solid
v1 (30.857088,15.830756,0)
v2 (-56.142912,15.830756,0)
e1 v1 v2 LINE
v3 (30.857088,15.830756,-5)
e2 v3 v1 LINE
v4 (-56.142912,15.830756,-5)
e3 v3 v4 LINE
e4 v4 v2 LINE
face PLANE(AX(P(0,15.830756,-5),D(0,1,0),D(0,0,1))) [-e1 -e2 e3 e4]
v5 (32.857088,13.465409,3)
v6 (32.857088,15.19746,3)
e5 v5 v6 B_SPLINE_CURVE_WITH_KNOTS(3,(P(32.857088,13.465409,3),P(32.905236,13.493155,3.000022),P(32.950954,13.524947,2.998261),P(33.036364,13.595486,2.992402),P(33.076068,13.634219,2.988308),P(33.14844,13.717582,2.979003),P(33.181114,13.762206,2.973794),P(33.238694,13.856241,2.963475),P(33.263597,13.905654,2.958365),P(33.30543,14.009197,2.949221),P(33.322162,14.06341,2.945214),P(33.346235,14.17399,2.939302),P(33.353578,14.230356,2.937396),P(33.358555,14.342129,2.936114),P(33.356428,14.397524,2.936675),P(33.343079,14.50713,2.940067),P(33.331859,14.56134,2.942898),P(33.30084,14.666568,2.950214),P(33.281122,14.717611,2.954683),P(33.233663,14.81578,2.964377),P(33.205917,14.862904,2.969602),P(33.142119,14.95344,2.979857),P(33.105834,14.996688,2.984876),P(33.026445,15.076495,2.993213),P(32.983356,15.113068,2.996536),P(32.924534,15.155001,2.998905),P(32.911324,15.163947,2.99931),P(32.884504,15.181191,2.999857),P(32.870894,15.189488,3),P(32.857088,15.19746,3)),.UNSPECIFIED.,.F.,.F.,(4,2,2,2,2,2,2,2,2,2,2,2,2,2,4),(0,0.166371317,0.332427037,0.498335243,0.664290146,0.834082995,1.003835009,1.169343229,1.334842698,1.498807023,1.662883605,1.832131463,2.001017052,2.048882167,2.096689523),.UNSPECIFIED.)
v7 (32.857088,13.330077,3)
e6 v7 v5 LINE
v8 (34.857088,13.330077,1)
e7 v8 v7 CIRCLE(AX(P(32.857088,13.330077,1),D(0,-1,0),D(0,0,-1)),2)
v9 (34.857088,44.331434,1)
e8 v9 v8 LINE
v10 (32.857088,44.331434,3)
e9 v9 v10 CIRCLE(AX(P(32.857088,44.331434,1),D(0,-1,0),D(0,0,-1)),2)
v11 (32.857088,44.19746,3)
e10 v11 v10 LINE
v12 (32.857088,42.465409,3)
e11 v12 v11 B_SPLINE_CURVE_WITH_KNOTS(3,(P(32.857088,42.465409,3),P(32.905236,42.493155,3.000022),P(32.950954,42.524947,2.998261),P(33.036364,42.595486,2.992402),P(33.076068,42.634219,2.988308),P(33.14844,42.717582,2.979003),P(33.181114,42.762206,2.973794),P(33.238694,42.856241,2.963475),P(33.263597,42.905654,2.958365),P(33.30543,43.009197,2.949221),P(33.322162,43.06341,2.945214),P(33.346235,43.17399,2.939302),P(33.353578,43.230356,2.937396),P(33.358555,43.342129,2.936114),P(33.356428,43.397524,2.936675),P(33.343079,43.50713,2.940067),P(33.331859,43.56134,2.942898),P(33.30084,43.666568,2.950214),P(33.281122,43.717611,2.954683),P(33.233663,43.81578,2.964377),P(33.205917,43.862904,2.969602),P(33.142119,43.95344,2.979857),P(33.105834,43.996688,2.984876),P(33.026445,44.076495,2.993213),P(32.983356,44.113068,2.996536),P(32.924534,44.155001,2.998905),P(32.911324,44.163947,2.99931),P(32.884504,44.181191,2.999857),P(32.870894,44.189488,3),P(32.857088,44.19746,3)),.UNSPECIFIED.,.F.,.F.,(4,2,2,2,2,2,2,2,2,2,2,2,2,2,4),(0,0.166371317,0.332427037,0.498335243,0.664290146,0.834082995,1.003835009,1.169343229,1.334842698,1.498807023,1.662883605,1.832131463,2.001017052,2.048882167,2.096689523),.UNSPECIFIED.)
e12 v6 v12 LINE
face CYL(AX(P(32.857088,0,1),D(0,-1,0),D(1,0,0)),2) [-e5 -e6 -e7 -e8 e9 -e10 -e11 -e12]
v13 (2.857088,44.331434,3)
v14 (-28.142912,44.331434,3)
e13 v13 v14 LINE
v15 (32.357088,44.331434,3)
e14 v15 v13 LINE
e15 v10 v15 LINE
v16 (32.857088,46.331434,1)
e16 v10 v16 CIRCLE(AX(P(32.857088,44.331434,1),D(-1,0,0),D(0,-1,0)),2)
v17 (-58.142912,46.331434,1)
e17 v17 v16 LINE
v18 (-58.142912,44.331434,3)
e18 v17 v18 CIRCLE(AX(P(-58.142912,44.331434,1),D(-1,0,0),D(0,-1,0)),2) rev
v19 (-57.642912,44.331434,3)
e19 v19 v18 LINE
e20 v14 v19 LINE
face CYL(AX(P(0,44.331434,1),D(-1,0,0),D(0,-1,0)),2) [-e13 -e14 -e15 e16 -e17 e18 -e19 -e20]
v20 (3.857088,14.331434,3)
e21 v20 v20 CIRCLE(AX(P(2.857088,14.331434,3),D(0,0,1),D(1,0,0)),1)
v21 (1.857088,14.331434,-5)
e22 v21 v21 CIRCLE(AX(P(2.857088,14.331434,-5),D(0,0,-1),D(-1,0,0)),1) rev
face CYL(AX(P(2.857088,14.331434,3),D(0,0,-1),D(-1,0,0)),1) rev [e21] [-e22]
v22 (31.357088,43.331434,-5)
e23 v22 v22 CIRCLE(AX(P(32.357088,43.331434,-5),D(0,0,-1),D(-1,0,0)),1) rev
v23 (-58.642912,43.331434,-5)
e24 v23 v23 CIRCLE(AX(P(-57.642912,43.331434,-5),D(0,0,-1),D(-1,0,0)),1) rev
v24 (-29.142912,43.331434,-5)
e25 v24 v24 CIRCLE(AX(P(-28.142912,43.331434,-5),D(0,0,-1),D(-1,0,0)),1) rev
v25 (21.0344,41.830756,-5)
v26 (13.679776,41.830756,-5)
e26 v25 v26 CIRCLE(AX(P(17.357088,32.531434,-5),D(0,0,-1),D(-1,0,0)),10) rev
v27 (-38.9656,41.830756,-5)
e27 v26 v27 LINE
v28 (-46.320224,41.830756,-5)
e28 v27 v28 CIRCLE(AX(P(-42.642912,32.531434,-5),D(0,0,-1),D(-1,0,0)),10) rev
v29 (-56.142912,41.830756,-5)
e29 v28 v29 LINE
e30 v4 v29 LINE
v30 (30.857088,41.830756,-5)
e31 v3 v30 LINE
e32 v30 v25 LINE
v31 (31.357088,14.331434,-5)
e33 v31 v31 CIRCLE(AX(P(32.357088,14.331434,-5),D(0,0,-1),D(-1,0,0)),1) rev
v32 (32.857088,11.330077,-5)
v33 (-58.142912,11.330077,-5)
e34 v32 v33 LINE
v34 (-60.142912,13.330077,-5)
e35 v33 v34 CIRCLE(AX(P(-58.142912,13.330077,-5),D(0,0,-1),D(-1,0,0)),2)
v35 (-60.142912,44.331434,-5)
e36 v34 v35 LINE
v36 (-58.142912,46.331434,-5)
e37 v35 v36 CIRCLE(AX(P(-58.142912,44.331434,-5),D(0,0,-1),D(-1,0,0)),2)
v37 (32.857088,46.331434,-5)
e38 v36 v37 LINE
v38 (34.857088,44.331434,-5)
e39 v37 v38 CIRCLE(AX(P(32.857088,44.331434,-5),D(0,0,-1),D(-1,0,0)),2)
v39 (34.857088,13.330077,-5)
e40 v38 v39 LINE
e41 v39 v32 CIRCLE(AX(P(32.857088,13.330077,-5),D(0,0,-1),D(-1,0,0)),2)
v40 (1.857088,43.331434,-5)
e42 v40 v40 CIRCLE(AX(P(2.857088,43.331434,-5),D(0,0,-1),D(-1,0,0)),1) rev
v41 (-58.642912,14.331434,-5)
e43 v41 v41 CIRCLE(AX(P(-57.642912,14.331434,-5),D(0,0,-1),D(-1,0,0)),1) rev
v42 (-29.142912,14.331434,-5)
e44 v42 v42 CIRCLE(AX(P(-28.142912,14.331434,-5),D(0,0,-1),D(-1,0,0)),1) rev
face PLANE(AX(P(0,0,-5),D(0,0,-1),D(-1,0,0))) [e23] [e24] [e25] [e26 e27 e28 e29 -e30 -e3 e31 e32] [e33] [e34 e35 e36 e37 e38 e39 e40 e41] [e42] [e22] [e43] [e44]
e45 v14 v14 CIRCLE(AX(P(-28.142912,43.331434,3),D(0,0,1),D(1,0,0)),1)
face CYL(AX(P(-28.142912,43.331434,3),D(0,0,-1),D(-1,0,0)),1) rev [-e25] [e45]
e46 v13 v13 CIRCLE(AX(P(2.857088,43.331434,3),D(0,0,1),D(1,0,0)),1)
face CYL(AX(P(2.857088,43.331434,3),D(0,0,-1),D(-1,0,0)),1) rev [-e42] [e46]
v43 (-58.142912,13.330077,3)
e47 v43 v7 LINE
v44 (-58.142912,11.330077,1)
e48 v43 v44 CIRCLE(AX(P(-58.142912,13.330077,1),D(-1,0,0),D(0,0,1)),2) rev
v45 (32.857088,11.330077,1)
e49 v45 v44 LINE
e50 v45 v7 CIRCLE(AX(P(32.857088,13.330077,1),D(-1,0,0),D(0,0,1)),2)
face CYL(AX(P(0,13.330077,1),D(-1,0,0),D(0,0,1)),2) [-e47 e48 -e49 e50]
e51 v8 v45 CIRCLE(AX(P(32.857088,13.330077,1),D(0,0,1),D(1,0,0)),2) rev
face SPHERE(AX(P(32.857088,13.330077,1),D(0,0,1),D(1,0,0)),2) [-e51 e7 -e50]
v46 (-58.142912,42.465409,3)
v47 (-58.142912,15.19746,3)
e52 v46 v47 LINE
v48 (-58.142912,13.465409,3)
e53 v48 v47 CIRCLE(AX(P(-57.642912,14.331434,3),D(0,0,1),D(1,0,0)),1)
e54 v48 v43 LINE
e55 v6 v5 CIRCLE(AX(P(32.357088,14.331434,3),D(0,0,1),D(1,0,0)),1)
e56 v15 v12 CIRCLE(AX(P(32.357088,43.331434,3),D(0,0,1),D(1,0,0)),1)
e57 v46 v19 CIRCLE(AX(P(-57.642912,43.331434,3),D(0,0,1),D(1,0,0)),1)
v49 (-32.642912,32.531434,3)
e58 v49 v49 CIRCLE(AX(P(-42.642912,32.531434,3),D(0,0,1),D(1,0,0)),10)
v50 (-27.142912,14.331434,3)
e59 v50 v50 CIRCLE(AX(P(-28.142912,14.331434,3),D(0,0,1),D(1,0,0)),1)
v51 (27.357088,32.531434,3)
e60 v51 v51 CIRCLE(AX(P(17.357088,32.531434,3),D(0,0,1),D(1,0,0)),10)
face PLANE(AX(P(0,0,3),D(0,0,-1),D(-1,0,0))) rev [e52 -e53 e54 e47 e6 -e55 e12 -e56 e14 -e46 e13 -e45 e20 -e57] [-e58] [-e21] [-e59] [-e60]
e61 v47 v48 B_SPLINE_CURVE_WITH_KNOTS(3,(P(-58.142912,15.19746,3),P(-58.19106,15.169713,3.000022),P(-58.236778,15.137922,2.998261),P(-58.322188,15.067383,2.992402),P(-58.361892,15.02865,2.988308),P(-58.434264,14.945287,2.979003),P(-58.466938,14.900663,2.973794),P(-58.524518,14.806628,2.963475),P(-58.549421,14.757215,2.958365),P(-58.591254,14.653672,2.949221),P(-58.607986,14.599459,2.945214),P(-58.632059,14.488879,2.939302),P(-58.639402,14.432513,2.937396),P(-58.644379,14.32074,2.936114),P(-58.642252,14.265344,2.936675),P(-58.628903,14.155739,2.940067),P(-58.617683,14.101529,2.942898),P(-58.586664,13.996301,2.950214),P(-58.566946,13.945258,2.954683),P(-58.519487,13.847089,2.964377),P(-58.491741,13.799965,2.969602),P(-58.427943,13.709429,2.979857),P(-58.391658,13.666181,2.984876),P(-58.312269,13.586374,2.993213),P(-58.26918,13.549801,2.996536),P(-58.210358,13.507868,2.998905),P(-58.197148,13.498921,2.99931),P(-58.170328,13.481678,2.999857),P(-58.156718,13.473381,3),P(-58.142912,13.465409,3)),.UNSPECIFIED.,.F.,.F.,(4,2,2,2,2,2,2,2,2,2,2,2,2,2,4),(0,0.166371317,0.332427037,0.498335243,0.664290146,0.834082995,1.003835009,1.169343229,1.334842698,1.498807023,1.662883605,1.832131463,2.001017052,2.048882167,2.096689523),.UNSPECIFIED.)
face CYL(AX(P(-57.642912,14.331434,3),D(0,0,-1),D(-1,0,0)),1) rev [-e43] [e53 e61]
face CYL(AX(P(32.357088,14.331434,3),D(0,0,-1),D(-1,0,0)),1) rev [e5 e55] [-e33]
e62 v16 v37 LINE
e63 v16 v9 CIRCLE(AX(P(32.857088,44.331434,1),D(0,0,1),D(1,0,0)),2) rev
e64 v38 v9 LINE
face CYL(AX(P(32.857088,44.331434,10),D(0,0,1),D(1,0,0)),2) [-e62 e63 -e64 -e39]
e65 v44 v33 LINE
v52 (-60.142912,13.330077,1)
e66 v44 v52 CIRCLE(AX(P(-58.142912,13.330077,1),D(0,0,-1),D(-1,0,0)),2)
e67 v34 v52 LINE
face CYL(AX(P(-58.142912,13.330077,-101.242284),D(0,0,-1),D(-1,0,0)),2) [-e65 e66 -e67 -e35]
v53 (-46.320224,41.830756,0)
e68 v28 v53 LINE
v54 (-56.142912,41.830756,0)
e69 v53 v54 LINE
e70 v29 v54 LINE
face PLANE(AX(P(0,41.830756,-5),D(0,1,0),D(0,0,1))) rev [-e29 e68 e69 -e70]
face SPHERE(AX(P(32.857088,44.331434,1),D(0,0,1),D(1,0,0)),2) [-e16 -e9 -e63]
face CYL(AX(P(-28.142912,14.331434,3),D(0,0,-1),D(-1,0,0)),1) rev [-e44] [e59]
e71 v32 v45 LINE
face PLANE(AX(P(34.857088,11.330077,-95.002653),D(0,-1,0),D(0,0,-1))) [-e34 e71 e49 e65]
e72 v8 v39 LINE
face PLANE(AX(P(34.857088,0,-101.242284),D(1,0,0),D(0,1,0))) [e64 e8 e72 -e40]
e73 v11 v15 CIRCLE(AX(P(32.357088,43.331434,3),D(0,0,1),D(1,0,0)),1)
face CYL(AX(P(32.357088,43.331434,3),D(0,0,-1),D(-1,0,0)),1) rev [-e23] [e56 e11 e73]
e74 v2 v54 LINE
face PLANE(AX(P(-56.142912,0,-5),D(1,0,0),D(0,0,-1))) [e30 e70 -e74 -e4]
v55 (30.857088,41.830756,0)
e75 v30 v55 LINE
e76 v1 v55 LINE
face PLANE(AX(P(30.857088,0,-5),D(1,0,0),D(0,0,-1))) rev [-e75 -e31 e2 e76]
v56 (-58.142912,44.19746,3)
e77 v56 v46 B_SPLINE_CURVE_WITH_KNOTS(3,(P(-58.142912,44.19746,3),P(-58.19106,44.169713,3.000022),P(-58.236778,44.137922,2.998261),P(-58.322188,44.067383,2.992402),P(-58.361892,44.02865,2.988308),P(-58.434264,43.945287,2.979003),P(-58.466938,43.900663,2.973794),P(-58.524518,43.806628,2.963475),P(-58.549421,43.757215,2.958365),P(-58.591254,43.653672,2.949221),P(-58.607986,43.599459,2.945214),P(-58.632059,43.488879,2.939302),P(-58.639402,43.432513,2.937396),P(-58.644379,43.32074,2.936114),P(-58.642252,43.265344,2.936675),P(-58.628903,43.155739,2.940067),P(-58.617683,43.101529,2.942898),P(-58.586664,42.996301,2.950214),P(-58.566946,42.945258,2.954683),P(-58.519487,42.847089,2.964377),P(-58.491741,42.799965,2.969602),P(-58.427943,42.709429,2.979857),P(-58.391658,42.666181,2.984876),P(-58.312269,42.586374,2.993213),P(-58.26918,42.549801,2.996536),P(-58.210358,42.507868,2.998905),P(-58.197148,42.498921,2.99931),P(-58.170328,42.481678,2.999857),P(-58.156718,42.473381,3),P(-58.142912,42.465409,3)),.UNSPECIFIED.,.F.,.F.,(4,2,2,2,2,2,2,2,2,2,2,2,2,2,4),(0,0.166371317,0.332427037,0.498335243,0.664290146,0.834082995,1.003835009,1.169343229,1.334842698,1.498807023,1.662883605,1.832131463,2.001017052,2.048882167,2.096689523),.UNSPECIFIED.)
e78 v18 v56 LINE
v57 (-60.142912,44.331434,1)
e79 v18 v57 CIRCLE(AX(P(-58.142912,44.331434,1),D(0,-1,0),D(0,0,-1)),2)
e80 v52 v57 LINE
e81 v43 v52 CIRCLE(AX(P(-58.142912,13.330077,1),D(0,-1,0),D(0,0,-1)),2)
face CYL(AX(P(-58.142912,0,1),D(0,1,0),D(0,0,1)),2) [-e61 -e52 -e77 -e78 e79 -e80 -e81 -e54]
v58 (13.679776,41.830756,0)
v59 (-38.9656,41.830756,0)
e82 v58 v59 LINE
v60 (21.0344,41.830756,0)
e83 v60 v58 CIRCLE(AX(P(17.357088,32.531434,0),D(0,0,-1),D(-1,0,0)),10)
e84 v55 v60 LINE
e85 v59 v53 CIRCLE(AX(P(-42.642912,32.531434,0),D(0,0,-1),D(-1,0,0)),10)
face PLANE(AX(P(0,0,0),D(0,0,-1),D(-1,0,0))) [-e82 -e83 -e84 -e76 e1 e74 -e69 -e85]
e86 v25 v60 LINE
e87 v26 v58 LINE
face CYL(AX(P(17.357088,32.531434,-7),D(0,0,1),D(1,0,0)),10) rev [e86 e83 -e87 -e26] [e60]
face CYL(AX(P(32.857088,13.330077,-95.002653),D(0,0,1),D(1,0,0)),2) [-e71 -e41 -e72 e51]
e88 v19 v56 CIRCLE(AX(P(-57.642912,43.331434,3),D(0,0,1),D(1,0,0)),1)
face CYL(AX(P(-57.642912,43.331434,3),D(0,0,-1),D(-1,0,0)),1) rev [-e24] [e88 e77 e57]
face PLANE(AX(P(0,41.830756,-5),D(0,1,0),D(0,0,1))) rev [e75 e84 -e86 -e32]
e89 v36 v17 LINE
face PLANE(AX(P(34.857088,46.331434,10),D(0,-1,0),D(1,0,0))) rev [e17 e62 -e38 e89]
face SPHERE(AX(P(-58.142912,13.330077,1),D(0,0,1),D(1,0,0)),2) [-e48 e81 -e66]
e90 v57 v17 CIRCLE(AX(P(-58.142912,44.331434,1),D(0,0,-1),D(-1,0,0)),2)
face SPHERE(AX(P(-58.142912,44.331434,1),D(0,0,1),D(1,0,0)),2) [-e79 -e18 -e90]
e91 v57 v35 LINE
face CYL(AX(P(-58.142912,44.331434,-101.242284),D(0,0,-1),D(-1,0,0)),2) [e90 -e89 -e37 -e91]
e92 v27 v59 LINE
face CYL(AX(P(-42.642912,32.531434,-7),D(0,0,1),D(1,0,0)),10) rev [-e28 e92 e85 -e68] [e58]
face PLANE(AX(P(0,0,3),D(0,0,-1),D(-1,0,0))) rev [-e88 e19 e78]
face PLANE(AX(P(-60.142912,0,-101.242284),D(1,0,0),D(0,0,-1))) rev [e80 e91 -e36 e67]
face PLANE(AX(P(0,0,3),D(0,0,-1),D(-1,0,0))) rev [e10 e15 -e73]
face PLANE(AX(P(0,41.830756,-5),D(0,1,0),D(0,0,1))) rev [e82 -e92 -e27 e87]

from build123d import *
from build123d.topology import SkipClean

# Parameters (mm, degrees)
SKETCH2_W           = 93
SKETCH2_H           = 32
SKETCH2_R           = 1
BOSS_EXTRUDE1_DEPTH = 3
SKETCH6_W           = 95
SKETCH6_H           = 35
SKETCH6_W_2         = 93
SKETCH6_H_2         = 32
BOSS_EXTRUDE2_DEPTH = 3
SKETCH8_W           = 95
SKETCH8_H           = 0.708642827
CUT_EXTRUDE6_DEPTH  = 10
SKETCH9_W           = 95
SKETCH9_H           = 0.71
BOSS_EXTRUDE3_DEPTH = 3
SKETCH10_R          = 10
CUT_EXTRUDE7_DEPTH  = 10
BOSS_EXTRUDE7_START = 5
SKETCH11_R          = 1
BOSS_EXTRUDE7_DEPTH = 5
FILLET1_R           = 2
FILLET2_R           = 2


# Some blends are built 0.0001 mm under size
with BuildPart() as part:
    # Sketch2 → Boss-Extrude1 (new body)
    with BuildSketch(Plane.XY):
        with Locations((-12.642912006, 28.831434421)):
            Rectangle(SKETCH2_W, SKETCH2_H)
        with Locations((-57.642912006, 43.331434421)):
            Circle(SKETCH2_R, mode=Mode.SUBTRACT)
        with Locations((-57.642912006, 14.331434421)):
            Circle(SKETCH2_R, mode=Mode.SUBTRACT)
        with Locations((-28.142912006, 43.331434421)):
            Circle(SKETCH2_R, mode=Mode.SUBTRACT)
        with Locations((2.857087994, 43.331434421)):
            Circle(SKETCH2_R, mode=Mode.SUBTRACT)
        with Locations((2.857087994, 14.331434421)):
            Circle(SKETCH2_R, mode=Mode.SUBTRACT)
        with Locations((-28.142912006, 14.331434421)):
            Circle(SKETCH2_R, mode=Mode.SUBTRACT)
        with Locations((32.357087994, 14.331434421)):
            Circle(SKETCH2_R, mode=Mode.SUBTRACT)
        with Locations((32.357087994, 43.331434421)):
            Circle(SKETCH2_R, mode=Mode.SUBTRACT)
    extrude(amount=BOSS_EXTRUDE1_DEPTH)

    # Sketch6 → Boss-Extrude2 (add)
    with BuildSketch(Plane.XY.offset(3)):
        with Locations((-12.642912006, 29.540077248)):
            Rectangle(SKETCH6_W, SKETCH6_H)
        with Locations((-12.642912006, 28.831434421)):
            Rectangle(SKETCH6_W_2, SKETCH6_H_2, mode=Mode.SUBTRACT)
    extrude(amount=-BOSS_EXTRUDE2_DEPTH)

    # Sketch8 → Cut-Extrude6 (cut)
    with BuildSketch(Plane(origin=(0, 0, 0), x_dir=(-1, 0, 0), z_dir=(0, 0, -1))):
        with Locations((12.642912006, 46.685755835)):
            Rectangle(SKETCH8_W, SKETCH8_H)
    extrude(amount=-CUT_EXTRUDE6_DEPTH, mode=Mode.SUBTRACT)

    # Sketch9 → Boss-Extrude3 (add)
    with BuildSketch(Plane.XY.offset(3)):
        with Locations((-12.642912006, 11.685077248)):
            Rectangle(SKETCH9_W, SKETCH9_H)
    extrude(amount=-BOSS_EXTRUDE3_DEPTH)

    # Sketch10 → Cut-Extrude7 (cut)
    with BuildSketch(Plane.XY.offset(3)):
        with Locations((-42.642912006, 32.531434421)):
            Circle(SKETCH10_R)
        with Locations((17.357087994, 32.531434421)):
            Circle(SKETCH10_R)
    extrude(amount=-CUT_EXTRUDE7_DEPTH, mode=Mode.SUBTRACT)

    # Sketch11 → Boss-Extrude7 (add)
    # profile 1 of 2: a face of its own
    with SkipClean():  # the faces are left unmerged after this step: merging them gives an invalid solid
        with BuildSketch(Plane(origin=(0, 0, 0), x_dir=(-1, 0, 0), z_dir=(0, 0, -1)).offset(BOSS_EXTRUDE7_START)):
            with BuildLine():
                Line((60.142912006, 46.331434421), (-34.857087994, 46.331434421))
                Line((-34.857087994, 46.331434421), (-22.64143408, 41.830755835))
                Line((-22.64143408, 41.830755835), (-21.034399682, 41.830755835))
                ThreePointArc((-21.034399682, 41.830755835), (-17.357087994, 42.531434421), (-13.679776305, 41.830755835))
                Line((-13.679776305, 41.830755835), (38.965600318, 41.830755835))
                ThreePointArc((38.965600318, 41.830755835), (42.642912006, 42.531434421), (46.320223695, 41.830755835))
                Line((46.320223695, 41.830755835), (56.142912006, 41.830755835))
                Line((56.142912006, 41.830755835), (56.142912006, 15.830755835))
                Line((56.142912006, 15.830755835), (47.927258092, 15.830755835))
                Line((47.927258092, 15.830755835), (60.142912006, 11.330077248))
                Line((60.142912006, 11.330077248), (60.142912006, 46.331434421))
            make_face()
            with Locations((57.642912006, 14.331434421)):
                Circle(SKETCH11_R, mode=Mode.SUBTRACT)
            with Locations((-2.857087994, 43.331434421)):
                Circle(SKETCH11_R, mode=Mode.SUBTRACT)
            with Locations((28.142912006, 43.331434421)):
                Circle(SKETCH11_R, mode=Mode.SUBTRACT)
            with Locations((57.642912006, 43.331434421)):
                Circle(SKETCH11_R, mode=Mode.SUBTRACT)
        # profile 2 of 2: a face of its own
        with BuildSketch(Plane(origin=(0, 0, 0), x_dir=(-1, 0, 0), z_dir=(0, 0, -1)).offset(BOSS_EXTRUDE7_START)):
            Polygon((-22.64143408, 41.830755835), (-34.857087994, 46.331434421), (-34.857087994, 11.330077248), (60.142912006, 11.330077248), (47.927258092, 15.830755835), (-30.857087994, 15.830755835), (-30.857087994, 41.830755835), align=None)
            with Locations((-32.357087994, 14.331434421)):
                Circle(SKETCH11_R, mode=Mode.SUBTRACT)
            with Locations((-2.857087994, 14.331434421)):
                Circle(SKETCH11_R, mode=Mode.SUBTRACT)
            with Locations((28.142912006, 14.331434421)):
                Circle(SKETCH11_R, mode=Mode.SUBTRACT)
            with Locations((-32.357087994, 43.331434421)):
                Circle(SKETCH11_R, mode=Mode.SUBTRACT)
        extrude(amount=-BOSS_EXTRUDE7_DEPTH)

    # Fillet1
    fillet1_edges = [part.edges().sort_by_distance(p)[0] for p in [
        (-60.142912006, 46.331434421, -2.5),
        (34.857087994, 46.331434421, -2.5),
        (-12.642912006, 46.331434421, 3),
        (-12.642912006, 11.330077248, 3),
        (-60.142912006, 11.330077248, -2.5),
        (34.857087994, 11.330077248, -2.5),
    ]]
    fillet(fillet1_edges, radius=FILLET1_R - 0.0001)  # a hair under: the kernel refuses the full size

    # Fillet2
    # the kernel refuses this fillet: 2 mm, written as the material it takes off along each edge
    with BuildSketch(Plane(origin=(-58.142912006, 11.330077248, 1), x_dir=(0, 0, 1), z_dir=(1, 0, 0))) as fillet2_piece_1:
        with BuildLine():
            CenterArc((0.0001, -1.9999), 1.9999, 0, 90)
            Line((2, -1.9999), (2, 0))
            Line((2, 0), (0.0001, 0))
        make_face()
    revolve(axis=Axis((-58.142912006, 11.330077248, 1), (0, -1, 0)), revolution_arc=90, mode=Mode.SUBTRACT)
    with BuildSketch(Plane(origin=(32.857087994, 11.330077248, 1), x_dir=(1, 0, 0), z_dir=(0, 0, -1))) as fillet2_piece_2:
        with BuildLine():
            CenterArc((0.0001, -1.9999), 1.9999, 0, 90)
            Line((2, -1.9999), (2, 0))
            Line((2, 0), (0.0001, 0))
        make_face()
    revolve(axis=Axis((32.857087994, 11.330077248, 1), (0, -1, 0)), revolution_arc=90, mode=Mode.SUBTRACT)
    with BuildSketch(Plane(origin=(32.857087994, 46.331434421, 1), x_dir=(0, 0, 1), z_dir=(-1, 0, 0))) as fillet2_piece_3:
        with BuildLine():
            CenterArc((0.0001, -1.9999), 1.9999, 0, 90)
            Line((2, -1.9999), (2, 0))
            Line((2, 0), (0.0001, 0))
        make_face()
    revolve(axis=Axis((32.857087994, 46.331434421, 1), (0, 1, 0)), revolution_arc=90, mode=Mode.SUBTRACT)
    with BuildSketch(Plane(origin=(-58.142912006, 46.331434421, 1), x_dir=(-1, 0, 0), z_dir=(0, 0, -1))) as fillet2_piece_4:
        with BuildLine():
            CenterArc((0.0001, -1.9999), 1.9999, 0, 90)
            Line((2, -1.9999), (2, 0))
            Line((2, 0), (0.0001, 0))
        make_face()
    revolve(axis=Axis((-58.142912006, 46.331434421, 1), (0, 1, 0)), revolution_arc=90, mode=Mode.SUBTRACT)
    with BuildSketch(Plane(origin=(34.857087994, 11.330077248, 3), x_dir=(-1, 0, 0), z_dir=(0, 1, 0)), Plane(origin=(-60.142912006, 46.331434421, 3), x_dir=(1, 0, 0), z_dir=(0, -1, 0))) as fillet2_piece_5:
        with BuildLine():
            CenterArc((FILLET2_R, -FILLET2_R), FILLET2_R, 90, 90)
            Line((0, -FILLET2_R), (0, 0))
            Line((0, 0), (FILLET2_R, 0))
        make_face()
    extrude(amount=35.001357174, mode=Mode.SUBTRACT)


solid = part.part
